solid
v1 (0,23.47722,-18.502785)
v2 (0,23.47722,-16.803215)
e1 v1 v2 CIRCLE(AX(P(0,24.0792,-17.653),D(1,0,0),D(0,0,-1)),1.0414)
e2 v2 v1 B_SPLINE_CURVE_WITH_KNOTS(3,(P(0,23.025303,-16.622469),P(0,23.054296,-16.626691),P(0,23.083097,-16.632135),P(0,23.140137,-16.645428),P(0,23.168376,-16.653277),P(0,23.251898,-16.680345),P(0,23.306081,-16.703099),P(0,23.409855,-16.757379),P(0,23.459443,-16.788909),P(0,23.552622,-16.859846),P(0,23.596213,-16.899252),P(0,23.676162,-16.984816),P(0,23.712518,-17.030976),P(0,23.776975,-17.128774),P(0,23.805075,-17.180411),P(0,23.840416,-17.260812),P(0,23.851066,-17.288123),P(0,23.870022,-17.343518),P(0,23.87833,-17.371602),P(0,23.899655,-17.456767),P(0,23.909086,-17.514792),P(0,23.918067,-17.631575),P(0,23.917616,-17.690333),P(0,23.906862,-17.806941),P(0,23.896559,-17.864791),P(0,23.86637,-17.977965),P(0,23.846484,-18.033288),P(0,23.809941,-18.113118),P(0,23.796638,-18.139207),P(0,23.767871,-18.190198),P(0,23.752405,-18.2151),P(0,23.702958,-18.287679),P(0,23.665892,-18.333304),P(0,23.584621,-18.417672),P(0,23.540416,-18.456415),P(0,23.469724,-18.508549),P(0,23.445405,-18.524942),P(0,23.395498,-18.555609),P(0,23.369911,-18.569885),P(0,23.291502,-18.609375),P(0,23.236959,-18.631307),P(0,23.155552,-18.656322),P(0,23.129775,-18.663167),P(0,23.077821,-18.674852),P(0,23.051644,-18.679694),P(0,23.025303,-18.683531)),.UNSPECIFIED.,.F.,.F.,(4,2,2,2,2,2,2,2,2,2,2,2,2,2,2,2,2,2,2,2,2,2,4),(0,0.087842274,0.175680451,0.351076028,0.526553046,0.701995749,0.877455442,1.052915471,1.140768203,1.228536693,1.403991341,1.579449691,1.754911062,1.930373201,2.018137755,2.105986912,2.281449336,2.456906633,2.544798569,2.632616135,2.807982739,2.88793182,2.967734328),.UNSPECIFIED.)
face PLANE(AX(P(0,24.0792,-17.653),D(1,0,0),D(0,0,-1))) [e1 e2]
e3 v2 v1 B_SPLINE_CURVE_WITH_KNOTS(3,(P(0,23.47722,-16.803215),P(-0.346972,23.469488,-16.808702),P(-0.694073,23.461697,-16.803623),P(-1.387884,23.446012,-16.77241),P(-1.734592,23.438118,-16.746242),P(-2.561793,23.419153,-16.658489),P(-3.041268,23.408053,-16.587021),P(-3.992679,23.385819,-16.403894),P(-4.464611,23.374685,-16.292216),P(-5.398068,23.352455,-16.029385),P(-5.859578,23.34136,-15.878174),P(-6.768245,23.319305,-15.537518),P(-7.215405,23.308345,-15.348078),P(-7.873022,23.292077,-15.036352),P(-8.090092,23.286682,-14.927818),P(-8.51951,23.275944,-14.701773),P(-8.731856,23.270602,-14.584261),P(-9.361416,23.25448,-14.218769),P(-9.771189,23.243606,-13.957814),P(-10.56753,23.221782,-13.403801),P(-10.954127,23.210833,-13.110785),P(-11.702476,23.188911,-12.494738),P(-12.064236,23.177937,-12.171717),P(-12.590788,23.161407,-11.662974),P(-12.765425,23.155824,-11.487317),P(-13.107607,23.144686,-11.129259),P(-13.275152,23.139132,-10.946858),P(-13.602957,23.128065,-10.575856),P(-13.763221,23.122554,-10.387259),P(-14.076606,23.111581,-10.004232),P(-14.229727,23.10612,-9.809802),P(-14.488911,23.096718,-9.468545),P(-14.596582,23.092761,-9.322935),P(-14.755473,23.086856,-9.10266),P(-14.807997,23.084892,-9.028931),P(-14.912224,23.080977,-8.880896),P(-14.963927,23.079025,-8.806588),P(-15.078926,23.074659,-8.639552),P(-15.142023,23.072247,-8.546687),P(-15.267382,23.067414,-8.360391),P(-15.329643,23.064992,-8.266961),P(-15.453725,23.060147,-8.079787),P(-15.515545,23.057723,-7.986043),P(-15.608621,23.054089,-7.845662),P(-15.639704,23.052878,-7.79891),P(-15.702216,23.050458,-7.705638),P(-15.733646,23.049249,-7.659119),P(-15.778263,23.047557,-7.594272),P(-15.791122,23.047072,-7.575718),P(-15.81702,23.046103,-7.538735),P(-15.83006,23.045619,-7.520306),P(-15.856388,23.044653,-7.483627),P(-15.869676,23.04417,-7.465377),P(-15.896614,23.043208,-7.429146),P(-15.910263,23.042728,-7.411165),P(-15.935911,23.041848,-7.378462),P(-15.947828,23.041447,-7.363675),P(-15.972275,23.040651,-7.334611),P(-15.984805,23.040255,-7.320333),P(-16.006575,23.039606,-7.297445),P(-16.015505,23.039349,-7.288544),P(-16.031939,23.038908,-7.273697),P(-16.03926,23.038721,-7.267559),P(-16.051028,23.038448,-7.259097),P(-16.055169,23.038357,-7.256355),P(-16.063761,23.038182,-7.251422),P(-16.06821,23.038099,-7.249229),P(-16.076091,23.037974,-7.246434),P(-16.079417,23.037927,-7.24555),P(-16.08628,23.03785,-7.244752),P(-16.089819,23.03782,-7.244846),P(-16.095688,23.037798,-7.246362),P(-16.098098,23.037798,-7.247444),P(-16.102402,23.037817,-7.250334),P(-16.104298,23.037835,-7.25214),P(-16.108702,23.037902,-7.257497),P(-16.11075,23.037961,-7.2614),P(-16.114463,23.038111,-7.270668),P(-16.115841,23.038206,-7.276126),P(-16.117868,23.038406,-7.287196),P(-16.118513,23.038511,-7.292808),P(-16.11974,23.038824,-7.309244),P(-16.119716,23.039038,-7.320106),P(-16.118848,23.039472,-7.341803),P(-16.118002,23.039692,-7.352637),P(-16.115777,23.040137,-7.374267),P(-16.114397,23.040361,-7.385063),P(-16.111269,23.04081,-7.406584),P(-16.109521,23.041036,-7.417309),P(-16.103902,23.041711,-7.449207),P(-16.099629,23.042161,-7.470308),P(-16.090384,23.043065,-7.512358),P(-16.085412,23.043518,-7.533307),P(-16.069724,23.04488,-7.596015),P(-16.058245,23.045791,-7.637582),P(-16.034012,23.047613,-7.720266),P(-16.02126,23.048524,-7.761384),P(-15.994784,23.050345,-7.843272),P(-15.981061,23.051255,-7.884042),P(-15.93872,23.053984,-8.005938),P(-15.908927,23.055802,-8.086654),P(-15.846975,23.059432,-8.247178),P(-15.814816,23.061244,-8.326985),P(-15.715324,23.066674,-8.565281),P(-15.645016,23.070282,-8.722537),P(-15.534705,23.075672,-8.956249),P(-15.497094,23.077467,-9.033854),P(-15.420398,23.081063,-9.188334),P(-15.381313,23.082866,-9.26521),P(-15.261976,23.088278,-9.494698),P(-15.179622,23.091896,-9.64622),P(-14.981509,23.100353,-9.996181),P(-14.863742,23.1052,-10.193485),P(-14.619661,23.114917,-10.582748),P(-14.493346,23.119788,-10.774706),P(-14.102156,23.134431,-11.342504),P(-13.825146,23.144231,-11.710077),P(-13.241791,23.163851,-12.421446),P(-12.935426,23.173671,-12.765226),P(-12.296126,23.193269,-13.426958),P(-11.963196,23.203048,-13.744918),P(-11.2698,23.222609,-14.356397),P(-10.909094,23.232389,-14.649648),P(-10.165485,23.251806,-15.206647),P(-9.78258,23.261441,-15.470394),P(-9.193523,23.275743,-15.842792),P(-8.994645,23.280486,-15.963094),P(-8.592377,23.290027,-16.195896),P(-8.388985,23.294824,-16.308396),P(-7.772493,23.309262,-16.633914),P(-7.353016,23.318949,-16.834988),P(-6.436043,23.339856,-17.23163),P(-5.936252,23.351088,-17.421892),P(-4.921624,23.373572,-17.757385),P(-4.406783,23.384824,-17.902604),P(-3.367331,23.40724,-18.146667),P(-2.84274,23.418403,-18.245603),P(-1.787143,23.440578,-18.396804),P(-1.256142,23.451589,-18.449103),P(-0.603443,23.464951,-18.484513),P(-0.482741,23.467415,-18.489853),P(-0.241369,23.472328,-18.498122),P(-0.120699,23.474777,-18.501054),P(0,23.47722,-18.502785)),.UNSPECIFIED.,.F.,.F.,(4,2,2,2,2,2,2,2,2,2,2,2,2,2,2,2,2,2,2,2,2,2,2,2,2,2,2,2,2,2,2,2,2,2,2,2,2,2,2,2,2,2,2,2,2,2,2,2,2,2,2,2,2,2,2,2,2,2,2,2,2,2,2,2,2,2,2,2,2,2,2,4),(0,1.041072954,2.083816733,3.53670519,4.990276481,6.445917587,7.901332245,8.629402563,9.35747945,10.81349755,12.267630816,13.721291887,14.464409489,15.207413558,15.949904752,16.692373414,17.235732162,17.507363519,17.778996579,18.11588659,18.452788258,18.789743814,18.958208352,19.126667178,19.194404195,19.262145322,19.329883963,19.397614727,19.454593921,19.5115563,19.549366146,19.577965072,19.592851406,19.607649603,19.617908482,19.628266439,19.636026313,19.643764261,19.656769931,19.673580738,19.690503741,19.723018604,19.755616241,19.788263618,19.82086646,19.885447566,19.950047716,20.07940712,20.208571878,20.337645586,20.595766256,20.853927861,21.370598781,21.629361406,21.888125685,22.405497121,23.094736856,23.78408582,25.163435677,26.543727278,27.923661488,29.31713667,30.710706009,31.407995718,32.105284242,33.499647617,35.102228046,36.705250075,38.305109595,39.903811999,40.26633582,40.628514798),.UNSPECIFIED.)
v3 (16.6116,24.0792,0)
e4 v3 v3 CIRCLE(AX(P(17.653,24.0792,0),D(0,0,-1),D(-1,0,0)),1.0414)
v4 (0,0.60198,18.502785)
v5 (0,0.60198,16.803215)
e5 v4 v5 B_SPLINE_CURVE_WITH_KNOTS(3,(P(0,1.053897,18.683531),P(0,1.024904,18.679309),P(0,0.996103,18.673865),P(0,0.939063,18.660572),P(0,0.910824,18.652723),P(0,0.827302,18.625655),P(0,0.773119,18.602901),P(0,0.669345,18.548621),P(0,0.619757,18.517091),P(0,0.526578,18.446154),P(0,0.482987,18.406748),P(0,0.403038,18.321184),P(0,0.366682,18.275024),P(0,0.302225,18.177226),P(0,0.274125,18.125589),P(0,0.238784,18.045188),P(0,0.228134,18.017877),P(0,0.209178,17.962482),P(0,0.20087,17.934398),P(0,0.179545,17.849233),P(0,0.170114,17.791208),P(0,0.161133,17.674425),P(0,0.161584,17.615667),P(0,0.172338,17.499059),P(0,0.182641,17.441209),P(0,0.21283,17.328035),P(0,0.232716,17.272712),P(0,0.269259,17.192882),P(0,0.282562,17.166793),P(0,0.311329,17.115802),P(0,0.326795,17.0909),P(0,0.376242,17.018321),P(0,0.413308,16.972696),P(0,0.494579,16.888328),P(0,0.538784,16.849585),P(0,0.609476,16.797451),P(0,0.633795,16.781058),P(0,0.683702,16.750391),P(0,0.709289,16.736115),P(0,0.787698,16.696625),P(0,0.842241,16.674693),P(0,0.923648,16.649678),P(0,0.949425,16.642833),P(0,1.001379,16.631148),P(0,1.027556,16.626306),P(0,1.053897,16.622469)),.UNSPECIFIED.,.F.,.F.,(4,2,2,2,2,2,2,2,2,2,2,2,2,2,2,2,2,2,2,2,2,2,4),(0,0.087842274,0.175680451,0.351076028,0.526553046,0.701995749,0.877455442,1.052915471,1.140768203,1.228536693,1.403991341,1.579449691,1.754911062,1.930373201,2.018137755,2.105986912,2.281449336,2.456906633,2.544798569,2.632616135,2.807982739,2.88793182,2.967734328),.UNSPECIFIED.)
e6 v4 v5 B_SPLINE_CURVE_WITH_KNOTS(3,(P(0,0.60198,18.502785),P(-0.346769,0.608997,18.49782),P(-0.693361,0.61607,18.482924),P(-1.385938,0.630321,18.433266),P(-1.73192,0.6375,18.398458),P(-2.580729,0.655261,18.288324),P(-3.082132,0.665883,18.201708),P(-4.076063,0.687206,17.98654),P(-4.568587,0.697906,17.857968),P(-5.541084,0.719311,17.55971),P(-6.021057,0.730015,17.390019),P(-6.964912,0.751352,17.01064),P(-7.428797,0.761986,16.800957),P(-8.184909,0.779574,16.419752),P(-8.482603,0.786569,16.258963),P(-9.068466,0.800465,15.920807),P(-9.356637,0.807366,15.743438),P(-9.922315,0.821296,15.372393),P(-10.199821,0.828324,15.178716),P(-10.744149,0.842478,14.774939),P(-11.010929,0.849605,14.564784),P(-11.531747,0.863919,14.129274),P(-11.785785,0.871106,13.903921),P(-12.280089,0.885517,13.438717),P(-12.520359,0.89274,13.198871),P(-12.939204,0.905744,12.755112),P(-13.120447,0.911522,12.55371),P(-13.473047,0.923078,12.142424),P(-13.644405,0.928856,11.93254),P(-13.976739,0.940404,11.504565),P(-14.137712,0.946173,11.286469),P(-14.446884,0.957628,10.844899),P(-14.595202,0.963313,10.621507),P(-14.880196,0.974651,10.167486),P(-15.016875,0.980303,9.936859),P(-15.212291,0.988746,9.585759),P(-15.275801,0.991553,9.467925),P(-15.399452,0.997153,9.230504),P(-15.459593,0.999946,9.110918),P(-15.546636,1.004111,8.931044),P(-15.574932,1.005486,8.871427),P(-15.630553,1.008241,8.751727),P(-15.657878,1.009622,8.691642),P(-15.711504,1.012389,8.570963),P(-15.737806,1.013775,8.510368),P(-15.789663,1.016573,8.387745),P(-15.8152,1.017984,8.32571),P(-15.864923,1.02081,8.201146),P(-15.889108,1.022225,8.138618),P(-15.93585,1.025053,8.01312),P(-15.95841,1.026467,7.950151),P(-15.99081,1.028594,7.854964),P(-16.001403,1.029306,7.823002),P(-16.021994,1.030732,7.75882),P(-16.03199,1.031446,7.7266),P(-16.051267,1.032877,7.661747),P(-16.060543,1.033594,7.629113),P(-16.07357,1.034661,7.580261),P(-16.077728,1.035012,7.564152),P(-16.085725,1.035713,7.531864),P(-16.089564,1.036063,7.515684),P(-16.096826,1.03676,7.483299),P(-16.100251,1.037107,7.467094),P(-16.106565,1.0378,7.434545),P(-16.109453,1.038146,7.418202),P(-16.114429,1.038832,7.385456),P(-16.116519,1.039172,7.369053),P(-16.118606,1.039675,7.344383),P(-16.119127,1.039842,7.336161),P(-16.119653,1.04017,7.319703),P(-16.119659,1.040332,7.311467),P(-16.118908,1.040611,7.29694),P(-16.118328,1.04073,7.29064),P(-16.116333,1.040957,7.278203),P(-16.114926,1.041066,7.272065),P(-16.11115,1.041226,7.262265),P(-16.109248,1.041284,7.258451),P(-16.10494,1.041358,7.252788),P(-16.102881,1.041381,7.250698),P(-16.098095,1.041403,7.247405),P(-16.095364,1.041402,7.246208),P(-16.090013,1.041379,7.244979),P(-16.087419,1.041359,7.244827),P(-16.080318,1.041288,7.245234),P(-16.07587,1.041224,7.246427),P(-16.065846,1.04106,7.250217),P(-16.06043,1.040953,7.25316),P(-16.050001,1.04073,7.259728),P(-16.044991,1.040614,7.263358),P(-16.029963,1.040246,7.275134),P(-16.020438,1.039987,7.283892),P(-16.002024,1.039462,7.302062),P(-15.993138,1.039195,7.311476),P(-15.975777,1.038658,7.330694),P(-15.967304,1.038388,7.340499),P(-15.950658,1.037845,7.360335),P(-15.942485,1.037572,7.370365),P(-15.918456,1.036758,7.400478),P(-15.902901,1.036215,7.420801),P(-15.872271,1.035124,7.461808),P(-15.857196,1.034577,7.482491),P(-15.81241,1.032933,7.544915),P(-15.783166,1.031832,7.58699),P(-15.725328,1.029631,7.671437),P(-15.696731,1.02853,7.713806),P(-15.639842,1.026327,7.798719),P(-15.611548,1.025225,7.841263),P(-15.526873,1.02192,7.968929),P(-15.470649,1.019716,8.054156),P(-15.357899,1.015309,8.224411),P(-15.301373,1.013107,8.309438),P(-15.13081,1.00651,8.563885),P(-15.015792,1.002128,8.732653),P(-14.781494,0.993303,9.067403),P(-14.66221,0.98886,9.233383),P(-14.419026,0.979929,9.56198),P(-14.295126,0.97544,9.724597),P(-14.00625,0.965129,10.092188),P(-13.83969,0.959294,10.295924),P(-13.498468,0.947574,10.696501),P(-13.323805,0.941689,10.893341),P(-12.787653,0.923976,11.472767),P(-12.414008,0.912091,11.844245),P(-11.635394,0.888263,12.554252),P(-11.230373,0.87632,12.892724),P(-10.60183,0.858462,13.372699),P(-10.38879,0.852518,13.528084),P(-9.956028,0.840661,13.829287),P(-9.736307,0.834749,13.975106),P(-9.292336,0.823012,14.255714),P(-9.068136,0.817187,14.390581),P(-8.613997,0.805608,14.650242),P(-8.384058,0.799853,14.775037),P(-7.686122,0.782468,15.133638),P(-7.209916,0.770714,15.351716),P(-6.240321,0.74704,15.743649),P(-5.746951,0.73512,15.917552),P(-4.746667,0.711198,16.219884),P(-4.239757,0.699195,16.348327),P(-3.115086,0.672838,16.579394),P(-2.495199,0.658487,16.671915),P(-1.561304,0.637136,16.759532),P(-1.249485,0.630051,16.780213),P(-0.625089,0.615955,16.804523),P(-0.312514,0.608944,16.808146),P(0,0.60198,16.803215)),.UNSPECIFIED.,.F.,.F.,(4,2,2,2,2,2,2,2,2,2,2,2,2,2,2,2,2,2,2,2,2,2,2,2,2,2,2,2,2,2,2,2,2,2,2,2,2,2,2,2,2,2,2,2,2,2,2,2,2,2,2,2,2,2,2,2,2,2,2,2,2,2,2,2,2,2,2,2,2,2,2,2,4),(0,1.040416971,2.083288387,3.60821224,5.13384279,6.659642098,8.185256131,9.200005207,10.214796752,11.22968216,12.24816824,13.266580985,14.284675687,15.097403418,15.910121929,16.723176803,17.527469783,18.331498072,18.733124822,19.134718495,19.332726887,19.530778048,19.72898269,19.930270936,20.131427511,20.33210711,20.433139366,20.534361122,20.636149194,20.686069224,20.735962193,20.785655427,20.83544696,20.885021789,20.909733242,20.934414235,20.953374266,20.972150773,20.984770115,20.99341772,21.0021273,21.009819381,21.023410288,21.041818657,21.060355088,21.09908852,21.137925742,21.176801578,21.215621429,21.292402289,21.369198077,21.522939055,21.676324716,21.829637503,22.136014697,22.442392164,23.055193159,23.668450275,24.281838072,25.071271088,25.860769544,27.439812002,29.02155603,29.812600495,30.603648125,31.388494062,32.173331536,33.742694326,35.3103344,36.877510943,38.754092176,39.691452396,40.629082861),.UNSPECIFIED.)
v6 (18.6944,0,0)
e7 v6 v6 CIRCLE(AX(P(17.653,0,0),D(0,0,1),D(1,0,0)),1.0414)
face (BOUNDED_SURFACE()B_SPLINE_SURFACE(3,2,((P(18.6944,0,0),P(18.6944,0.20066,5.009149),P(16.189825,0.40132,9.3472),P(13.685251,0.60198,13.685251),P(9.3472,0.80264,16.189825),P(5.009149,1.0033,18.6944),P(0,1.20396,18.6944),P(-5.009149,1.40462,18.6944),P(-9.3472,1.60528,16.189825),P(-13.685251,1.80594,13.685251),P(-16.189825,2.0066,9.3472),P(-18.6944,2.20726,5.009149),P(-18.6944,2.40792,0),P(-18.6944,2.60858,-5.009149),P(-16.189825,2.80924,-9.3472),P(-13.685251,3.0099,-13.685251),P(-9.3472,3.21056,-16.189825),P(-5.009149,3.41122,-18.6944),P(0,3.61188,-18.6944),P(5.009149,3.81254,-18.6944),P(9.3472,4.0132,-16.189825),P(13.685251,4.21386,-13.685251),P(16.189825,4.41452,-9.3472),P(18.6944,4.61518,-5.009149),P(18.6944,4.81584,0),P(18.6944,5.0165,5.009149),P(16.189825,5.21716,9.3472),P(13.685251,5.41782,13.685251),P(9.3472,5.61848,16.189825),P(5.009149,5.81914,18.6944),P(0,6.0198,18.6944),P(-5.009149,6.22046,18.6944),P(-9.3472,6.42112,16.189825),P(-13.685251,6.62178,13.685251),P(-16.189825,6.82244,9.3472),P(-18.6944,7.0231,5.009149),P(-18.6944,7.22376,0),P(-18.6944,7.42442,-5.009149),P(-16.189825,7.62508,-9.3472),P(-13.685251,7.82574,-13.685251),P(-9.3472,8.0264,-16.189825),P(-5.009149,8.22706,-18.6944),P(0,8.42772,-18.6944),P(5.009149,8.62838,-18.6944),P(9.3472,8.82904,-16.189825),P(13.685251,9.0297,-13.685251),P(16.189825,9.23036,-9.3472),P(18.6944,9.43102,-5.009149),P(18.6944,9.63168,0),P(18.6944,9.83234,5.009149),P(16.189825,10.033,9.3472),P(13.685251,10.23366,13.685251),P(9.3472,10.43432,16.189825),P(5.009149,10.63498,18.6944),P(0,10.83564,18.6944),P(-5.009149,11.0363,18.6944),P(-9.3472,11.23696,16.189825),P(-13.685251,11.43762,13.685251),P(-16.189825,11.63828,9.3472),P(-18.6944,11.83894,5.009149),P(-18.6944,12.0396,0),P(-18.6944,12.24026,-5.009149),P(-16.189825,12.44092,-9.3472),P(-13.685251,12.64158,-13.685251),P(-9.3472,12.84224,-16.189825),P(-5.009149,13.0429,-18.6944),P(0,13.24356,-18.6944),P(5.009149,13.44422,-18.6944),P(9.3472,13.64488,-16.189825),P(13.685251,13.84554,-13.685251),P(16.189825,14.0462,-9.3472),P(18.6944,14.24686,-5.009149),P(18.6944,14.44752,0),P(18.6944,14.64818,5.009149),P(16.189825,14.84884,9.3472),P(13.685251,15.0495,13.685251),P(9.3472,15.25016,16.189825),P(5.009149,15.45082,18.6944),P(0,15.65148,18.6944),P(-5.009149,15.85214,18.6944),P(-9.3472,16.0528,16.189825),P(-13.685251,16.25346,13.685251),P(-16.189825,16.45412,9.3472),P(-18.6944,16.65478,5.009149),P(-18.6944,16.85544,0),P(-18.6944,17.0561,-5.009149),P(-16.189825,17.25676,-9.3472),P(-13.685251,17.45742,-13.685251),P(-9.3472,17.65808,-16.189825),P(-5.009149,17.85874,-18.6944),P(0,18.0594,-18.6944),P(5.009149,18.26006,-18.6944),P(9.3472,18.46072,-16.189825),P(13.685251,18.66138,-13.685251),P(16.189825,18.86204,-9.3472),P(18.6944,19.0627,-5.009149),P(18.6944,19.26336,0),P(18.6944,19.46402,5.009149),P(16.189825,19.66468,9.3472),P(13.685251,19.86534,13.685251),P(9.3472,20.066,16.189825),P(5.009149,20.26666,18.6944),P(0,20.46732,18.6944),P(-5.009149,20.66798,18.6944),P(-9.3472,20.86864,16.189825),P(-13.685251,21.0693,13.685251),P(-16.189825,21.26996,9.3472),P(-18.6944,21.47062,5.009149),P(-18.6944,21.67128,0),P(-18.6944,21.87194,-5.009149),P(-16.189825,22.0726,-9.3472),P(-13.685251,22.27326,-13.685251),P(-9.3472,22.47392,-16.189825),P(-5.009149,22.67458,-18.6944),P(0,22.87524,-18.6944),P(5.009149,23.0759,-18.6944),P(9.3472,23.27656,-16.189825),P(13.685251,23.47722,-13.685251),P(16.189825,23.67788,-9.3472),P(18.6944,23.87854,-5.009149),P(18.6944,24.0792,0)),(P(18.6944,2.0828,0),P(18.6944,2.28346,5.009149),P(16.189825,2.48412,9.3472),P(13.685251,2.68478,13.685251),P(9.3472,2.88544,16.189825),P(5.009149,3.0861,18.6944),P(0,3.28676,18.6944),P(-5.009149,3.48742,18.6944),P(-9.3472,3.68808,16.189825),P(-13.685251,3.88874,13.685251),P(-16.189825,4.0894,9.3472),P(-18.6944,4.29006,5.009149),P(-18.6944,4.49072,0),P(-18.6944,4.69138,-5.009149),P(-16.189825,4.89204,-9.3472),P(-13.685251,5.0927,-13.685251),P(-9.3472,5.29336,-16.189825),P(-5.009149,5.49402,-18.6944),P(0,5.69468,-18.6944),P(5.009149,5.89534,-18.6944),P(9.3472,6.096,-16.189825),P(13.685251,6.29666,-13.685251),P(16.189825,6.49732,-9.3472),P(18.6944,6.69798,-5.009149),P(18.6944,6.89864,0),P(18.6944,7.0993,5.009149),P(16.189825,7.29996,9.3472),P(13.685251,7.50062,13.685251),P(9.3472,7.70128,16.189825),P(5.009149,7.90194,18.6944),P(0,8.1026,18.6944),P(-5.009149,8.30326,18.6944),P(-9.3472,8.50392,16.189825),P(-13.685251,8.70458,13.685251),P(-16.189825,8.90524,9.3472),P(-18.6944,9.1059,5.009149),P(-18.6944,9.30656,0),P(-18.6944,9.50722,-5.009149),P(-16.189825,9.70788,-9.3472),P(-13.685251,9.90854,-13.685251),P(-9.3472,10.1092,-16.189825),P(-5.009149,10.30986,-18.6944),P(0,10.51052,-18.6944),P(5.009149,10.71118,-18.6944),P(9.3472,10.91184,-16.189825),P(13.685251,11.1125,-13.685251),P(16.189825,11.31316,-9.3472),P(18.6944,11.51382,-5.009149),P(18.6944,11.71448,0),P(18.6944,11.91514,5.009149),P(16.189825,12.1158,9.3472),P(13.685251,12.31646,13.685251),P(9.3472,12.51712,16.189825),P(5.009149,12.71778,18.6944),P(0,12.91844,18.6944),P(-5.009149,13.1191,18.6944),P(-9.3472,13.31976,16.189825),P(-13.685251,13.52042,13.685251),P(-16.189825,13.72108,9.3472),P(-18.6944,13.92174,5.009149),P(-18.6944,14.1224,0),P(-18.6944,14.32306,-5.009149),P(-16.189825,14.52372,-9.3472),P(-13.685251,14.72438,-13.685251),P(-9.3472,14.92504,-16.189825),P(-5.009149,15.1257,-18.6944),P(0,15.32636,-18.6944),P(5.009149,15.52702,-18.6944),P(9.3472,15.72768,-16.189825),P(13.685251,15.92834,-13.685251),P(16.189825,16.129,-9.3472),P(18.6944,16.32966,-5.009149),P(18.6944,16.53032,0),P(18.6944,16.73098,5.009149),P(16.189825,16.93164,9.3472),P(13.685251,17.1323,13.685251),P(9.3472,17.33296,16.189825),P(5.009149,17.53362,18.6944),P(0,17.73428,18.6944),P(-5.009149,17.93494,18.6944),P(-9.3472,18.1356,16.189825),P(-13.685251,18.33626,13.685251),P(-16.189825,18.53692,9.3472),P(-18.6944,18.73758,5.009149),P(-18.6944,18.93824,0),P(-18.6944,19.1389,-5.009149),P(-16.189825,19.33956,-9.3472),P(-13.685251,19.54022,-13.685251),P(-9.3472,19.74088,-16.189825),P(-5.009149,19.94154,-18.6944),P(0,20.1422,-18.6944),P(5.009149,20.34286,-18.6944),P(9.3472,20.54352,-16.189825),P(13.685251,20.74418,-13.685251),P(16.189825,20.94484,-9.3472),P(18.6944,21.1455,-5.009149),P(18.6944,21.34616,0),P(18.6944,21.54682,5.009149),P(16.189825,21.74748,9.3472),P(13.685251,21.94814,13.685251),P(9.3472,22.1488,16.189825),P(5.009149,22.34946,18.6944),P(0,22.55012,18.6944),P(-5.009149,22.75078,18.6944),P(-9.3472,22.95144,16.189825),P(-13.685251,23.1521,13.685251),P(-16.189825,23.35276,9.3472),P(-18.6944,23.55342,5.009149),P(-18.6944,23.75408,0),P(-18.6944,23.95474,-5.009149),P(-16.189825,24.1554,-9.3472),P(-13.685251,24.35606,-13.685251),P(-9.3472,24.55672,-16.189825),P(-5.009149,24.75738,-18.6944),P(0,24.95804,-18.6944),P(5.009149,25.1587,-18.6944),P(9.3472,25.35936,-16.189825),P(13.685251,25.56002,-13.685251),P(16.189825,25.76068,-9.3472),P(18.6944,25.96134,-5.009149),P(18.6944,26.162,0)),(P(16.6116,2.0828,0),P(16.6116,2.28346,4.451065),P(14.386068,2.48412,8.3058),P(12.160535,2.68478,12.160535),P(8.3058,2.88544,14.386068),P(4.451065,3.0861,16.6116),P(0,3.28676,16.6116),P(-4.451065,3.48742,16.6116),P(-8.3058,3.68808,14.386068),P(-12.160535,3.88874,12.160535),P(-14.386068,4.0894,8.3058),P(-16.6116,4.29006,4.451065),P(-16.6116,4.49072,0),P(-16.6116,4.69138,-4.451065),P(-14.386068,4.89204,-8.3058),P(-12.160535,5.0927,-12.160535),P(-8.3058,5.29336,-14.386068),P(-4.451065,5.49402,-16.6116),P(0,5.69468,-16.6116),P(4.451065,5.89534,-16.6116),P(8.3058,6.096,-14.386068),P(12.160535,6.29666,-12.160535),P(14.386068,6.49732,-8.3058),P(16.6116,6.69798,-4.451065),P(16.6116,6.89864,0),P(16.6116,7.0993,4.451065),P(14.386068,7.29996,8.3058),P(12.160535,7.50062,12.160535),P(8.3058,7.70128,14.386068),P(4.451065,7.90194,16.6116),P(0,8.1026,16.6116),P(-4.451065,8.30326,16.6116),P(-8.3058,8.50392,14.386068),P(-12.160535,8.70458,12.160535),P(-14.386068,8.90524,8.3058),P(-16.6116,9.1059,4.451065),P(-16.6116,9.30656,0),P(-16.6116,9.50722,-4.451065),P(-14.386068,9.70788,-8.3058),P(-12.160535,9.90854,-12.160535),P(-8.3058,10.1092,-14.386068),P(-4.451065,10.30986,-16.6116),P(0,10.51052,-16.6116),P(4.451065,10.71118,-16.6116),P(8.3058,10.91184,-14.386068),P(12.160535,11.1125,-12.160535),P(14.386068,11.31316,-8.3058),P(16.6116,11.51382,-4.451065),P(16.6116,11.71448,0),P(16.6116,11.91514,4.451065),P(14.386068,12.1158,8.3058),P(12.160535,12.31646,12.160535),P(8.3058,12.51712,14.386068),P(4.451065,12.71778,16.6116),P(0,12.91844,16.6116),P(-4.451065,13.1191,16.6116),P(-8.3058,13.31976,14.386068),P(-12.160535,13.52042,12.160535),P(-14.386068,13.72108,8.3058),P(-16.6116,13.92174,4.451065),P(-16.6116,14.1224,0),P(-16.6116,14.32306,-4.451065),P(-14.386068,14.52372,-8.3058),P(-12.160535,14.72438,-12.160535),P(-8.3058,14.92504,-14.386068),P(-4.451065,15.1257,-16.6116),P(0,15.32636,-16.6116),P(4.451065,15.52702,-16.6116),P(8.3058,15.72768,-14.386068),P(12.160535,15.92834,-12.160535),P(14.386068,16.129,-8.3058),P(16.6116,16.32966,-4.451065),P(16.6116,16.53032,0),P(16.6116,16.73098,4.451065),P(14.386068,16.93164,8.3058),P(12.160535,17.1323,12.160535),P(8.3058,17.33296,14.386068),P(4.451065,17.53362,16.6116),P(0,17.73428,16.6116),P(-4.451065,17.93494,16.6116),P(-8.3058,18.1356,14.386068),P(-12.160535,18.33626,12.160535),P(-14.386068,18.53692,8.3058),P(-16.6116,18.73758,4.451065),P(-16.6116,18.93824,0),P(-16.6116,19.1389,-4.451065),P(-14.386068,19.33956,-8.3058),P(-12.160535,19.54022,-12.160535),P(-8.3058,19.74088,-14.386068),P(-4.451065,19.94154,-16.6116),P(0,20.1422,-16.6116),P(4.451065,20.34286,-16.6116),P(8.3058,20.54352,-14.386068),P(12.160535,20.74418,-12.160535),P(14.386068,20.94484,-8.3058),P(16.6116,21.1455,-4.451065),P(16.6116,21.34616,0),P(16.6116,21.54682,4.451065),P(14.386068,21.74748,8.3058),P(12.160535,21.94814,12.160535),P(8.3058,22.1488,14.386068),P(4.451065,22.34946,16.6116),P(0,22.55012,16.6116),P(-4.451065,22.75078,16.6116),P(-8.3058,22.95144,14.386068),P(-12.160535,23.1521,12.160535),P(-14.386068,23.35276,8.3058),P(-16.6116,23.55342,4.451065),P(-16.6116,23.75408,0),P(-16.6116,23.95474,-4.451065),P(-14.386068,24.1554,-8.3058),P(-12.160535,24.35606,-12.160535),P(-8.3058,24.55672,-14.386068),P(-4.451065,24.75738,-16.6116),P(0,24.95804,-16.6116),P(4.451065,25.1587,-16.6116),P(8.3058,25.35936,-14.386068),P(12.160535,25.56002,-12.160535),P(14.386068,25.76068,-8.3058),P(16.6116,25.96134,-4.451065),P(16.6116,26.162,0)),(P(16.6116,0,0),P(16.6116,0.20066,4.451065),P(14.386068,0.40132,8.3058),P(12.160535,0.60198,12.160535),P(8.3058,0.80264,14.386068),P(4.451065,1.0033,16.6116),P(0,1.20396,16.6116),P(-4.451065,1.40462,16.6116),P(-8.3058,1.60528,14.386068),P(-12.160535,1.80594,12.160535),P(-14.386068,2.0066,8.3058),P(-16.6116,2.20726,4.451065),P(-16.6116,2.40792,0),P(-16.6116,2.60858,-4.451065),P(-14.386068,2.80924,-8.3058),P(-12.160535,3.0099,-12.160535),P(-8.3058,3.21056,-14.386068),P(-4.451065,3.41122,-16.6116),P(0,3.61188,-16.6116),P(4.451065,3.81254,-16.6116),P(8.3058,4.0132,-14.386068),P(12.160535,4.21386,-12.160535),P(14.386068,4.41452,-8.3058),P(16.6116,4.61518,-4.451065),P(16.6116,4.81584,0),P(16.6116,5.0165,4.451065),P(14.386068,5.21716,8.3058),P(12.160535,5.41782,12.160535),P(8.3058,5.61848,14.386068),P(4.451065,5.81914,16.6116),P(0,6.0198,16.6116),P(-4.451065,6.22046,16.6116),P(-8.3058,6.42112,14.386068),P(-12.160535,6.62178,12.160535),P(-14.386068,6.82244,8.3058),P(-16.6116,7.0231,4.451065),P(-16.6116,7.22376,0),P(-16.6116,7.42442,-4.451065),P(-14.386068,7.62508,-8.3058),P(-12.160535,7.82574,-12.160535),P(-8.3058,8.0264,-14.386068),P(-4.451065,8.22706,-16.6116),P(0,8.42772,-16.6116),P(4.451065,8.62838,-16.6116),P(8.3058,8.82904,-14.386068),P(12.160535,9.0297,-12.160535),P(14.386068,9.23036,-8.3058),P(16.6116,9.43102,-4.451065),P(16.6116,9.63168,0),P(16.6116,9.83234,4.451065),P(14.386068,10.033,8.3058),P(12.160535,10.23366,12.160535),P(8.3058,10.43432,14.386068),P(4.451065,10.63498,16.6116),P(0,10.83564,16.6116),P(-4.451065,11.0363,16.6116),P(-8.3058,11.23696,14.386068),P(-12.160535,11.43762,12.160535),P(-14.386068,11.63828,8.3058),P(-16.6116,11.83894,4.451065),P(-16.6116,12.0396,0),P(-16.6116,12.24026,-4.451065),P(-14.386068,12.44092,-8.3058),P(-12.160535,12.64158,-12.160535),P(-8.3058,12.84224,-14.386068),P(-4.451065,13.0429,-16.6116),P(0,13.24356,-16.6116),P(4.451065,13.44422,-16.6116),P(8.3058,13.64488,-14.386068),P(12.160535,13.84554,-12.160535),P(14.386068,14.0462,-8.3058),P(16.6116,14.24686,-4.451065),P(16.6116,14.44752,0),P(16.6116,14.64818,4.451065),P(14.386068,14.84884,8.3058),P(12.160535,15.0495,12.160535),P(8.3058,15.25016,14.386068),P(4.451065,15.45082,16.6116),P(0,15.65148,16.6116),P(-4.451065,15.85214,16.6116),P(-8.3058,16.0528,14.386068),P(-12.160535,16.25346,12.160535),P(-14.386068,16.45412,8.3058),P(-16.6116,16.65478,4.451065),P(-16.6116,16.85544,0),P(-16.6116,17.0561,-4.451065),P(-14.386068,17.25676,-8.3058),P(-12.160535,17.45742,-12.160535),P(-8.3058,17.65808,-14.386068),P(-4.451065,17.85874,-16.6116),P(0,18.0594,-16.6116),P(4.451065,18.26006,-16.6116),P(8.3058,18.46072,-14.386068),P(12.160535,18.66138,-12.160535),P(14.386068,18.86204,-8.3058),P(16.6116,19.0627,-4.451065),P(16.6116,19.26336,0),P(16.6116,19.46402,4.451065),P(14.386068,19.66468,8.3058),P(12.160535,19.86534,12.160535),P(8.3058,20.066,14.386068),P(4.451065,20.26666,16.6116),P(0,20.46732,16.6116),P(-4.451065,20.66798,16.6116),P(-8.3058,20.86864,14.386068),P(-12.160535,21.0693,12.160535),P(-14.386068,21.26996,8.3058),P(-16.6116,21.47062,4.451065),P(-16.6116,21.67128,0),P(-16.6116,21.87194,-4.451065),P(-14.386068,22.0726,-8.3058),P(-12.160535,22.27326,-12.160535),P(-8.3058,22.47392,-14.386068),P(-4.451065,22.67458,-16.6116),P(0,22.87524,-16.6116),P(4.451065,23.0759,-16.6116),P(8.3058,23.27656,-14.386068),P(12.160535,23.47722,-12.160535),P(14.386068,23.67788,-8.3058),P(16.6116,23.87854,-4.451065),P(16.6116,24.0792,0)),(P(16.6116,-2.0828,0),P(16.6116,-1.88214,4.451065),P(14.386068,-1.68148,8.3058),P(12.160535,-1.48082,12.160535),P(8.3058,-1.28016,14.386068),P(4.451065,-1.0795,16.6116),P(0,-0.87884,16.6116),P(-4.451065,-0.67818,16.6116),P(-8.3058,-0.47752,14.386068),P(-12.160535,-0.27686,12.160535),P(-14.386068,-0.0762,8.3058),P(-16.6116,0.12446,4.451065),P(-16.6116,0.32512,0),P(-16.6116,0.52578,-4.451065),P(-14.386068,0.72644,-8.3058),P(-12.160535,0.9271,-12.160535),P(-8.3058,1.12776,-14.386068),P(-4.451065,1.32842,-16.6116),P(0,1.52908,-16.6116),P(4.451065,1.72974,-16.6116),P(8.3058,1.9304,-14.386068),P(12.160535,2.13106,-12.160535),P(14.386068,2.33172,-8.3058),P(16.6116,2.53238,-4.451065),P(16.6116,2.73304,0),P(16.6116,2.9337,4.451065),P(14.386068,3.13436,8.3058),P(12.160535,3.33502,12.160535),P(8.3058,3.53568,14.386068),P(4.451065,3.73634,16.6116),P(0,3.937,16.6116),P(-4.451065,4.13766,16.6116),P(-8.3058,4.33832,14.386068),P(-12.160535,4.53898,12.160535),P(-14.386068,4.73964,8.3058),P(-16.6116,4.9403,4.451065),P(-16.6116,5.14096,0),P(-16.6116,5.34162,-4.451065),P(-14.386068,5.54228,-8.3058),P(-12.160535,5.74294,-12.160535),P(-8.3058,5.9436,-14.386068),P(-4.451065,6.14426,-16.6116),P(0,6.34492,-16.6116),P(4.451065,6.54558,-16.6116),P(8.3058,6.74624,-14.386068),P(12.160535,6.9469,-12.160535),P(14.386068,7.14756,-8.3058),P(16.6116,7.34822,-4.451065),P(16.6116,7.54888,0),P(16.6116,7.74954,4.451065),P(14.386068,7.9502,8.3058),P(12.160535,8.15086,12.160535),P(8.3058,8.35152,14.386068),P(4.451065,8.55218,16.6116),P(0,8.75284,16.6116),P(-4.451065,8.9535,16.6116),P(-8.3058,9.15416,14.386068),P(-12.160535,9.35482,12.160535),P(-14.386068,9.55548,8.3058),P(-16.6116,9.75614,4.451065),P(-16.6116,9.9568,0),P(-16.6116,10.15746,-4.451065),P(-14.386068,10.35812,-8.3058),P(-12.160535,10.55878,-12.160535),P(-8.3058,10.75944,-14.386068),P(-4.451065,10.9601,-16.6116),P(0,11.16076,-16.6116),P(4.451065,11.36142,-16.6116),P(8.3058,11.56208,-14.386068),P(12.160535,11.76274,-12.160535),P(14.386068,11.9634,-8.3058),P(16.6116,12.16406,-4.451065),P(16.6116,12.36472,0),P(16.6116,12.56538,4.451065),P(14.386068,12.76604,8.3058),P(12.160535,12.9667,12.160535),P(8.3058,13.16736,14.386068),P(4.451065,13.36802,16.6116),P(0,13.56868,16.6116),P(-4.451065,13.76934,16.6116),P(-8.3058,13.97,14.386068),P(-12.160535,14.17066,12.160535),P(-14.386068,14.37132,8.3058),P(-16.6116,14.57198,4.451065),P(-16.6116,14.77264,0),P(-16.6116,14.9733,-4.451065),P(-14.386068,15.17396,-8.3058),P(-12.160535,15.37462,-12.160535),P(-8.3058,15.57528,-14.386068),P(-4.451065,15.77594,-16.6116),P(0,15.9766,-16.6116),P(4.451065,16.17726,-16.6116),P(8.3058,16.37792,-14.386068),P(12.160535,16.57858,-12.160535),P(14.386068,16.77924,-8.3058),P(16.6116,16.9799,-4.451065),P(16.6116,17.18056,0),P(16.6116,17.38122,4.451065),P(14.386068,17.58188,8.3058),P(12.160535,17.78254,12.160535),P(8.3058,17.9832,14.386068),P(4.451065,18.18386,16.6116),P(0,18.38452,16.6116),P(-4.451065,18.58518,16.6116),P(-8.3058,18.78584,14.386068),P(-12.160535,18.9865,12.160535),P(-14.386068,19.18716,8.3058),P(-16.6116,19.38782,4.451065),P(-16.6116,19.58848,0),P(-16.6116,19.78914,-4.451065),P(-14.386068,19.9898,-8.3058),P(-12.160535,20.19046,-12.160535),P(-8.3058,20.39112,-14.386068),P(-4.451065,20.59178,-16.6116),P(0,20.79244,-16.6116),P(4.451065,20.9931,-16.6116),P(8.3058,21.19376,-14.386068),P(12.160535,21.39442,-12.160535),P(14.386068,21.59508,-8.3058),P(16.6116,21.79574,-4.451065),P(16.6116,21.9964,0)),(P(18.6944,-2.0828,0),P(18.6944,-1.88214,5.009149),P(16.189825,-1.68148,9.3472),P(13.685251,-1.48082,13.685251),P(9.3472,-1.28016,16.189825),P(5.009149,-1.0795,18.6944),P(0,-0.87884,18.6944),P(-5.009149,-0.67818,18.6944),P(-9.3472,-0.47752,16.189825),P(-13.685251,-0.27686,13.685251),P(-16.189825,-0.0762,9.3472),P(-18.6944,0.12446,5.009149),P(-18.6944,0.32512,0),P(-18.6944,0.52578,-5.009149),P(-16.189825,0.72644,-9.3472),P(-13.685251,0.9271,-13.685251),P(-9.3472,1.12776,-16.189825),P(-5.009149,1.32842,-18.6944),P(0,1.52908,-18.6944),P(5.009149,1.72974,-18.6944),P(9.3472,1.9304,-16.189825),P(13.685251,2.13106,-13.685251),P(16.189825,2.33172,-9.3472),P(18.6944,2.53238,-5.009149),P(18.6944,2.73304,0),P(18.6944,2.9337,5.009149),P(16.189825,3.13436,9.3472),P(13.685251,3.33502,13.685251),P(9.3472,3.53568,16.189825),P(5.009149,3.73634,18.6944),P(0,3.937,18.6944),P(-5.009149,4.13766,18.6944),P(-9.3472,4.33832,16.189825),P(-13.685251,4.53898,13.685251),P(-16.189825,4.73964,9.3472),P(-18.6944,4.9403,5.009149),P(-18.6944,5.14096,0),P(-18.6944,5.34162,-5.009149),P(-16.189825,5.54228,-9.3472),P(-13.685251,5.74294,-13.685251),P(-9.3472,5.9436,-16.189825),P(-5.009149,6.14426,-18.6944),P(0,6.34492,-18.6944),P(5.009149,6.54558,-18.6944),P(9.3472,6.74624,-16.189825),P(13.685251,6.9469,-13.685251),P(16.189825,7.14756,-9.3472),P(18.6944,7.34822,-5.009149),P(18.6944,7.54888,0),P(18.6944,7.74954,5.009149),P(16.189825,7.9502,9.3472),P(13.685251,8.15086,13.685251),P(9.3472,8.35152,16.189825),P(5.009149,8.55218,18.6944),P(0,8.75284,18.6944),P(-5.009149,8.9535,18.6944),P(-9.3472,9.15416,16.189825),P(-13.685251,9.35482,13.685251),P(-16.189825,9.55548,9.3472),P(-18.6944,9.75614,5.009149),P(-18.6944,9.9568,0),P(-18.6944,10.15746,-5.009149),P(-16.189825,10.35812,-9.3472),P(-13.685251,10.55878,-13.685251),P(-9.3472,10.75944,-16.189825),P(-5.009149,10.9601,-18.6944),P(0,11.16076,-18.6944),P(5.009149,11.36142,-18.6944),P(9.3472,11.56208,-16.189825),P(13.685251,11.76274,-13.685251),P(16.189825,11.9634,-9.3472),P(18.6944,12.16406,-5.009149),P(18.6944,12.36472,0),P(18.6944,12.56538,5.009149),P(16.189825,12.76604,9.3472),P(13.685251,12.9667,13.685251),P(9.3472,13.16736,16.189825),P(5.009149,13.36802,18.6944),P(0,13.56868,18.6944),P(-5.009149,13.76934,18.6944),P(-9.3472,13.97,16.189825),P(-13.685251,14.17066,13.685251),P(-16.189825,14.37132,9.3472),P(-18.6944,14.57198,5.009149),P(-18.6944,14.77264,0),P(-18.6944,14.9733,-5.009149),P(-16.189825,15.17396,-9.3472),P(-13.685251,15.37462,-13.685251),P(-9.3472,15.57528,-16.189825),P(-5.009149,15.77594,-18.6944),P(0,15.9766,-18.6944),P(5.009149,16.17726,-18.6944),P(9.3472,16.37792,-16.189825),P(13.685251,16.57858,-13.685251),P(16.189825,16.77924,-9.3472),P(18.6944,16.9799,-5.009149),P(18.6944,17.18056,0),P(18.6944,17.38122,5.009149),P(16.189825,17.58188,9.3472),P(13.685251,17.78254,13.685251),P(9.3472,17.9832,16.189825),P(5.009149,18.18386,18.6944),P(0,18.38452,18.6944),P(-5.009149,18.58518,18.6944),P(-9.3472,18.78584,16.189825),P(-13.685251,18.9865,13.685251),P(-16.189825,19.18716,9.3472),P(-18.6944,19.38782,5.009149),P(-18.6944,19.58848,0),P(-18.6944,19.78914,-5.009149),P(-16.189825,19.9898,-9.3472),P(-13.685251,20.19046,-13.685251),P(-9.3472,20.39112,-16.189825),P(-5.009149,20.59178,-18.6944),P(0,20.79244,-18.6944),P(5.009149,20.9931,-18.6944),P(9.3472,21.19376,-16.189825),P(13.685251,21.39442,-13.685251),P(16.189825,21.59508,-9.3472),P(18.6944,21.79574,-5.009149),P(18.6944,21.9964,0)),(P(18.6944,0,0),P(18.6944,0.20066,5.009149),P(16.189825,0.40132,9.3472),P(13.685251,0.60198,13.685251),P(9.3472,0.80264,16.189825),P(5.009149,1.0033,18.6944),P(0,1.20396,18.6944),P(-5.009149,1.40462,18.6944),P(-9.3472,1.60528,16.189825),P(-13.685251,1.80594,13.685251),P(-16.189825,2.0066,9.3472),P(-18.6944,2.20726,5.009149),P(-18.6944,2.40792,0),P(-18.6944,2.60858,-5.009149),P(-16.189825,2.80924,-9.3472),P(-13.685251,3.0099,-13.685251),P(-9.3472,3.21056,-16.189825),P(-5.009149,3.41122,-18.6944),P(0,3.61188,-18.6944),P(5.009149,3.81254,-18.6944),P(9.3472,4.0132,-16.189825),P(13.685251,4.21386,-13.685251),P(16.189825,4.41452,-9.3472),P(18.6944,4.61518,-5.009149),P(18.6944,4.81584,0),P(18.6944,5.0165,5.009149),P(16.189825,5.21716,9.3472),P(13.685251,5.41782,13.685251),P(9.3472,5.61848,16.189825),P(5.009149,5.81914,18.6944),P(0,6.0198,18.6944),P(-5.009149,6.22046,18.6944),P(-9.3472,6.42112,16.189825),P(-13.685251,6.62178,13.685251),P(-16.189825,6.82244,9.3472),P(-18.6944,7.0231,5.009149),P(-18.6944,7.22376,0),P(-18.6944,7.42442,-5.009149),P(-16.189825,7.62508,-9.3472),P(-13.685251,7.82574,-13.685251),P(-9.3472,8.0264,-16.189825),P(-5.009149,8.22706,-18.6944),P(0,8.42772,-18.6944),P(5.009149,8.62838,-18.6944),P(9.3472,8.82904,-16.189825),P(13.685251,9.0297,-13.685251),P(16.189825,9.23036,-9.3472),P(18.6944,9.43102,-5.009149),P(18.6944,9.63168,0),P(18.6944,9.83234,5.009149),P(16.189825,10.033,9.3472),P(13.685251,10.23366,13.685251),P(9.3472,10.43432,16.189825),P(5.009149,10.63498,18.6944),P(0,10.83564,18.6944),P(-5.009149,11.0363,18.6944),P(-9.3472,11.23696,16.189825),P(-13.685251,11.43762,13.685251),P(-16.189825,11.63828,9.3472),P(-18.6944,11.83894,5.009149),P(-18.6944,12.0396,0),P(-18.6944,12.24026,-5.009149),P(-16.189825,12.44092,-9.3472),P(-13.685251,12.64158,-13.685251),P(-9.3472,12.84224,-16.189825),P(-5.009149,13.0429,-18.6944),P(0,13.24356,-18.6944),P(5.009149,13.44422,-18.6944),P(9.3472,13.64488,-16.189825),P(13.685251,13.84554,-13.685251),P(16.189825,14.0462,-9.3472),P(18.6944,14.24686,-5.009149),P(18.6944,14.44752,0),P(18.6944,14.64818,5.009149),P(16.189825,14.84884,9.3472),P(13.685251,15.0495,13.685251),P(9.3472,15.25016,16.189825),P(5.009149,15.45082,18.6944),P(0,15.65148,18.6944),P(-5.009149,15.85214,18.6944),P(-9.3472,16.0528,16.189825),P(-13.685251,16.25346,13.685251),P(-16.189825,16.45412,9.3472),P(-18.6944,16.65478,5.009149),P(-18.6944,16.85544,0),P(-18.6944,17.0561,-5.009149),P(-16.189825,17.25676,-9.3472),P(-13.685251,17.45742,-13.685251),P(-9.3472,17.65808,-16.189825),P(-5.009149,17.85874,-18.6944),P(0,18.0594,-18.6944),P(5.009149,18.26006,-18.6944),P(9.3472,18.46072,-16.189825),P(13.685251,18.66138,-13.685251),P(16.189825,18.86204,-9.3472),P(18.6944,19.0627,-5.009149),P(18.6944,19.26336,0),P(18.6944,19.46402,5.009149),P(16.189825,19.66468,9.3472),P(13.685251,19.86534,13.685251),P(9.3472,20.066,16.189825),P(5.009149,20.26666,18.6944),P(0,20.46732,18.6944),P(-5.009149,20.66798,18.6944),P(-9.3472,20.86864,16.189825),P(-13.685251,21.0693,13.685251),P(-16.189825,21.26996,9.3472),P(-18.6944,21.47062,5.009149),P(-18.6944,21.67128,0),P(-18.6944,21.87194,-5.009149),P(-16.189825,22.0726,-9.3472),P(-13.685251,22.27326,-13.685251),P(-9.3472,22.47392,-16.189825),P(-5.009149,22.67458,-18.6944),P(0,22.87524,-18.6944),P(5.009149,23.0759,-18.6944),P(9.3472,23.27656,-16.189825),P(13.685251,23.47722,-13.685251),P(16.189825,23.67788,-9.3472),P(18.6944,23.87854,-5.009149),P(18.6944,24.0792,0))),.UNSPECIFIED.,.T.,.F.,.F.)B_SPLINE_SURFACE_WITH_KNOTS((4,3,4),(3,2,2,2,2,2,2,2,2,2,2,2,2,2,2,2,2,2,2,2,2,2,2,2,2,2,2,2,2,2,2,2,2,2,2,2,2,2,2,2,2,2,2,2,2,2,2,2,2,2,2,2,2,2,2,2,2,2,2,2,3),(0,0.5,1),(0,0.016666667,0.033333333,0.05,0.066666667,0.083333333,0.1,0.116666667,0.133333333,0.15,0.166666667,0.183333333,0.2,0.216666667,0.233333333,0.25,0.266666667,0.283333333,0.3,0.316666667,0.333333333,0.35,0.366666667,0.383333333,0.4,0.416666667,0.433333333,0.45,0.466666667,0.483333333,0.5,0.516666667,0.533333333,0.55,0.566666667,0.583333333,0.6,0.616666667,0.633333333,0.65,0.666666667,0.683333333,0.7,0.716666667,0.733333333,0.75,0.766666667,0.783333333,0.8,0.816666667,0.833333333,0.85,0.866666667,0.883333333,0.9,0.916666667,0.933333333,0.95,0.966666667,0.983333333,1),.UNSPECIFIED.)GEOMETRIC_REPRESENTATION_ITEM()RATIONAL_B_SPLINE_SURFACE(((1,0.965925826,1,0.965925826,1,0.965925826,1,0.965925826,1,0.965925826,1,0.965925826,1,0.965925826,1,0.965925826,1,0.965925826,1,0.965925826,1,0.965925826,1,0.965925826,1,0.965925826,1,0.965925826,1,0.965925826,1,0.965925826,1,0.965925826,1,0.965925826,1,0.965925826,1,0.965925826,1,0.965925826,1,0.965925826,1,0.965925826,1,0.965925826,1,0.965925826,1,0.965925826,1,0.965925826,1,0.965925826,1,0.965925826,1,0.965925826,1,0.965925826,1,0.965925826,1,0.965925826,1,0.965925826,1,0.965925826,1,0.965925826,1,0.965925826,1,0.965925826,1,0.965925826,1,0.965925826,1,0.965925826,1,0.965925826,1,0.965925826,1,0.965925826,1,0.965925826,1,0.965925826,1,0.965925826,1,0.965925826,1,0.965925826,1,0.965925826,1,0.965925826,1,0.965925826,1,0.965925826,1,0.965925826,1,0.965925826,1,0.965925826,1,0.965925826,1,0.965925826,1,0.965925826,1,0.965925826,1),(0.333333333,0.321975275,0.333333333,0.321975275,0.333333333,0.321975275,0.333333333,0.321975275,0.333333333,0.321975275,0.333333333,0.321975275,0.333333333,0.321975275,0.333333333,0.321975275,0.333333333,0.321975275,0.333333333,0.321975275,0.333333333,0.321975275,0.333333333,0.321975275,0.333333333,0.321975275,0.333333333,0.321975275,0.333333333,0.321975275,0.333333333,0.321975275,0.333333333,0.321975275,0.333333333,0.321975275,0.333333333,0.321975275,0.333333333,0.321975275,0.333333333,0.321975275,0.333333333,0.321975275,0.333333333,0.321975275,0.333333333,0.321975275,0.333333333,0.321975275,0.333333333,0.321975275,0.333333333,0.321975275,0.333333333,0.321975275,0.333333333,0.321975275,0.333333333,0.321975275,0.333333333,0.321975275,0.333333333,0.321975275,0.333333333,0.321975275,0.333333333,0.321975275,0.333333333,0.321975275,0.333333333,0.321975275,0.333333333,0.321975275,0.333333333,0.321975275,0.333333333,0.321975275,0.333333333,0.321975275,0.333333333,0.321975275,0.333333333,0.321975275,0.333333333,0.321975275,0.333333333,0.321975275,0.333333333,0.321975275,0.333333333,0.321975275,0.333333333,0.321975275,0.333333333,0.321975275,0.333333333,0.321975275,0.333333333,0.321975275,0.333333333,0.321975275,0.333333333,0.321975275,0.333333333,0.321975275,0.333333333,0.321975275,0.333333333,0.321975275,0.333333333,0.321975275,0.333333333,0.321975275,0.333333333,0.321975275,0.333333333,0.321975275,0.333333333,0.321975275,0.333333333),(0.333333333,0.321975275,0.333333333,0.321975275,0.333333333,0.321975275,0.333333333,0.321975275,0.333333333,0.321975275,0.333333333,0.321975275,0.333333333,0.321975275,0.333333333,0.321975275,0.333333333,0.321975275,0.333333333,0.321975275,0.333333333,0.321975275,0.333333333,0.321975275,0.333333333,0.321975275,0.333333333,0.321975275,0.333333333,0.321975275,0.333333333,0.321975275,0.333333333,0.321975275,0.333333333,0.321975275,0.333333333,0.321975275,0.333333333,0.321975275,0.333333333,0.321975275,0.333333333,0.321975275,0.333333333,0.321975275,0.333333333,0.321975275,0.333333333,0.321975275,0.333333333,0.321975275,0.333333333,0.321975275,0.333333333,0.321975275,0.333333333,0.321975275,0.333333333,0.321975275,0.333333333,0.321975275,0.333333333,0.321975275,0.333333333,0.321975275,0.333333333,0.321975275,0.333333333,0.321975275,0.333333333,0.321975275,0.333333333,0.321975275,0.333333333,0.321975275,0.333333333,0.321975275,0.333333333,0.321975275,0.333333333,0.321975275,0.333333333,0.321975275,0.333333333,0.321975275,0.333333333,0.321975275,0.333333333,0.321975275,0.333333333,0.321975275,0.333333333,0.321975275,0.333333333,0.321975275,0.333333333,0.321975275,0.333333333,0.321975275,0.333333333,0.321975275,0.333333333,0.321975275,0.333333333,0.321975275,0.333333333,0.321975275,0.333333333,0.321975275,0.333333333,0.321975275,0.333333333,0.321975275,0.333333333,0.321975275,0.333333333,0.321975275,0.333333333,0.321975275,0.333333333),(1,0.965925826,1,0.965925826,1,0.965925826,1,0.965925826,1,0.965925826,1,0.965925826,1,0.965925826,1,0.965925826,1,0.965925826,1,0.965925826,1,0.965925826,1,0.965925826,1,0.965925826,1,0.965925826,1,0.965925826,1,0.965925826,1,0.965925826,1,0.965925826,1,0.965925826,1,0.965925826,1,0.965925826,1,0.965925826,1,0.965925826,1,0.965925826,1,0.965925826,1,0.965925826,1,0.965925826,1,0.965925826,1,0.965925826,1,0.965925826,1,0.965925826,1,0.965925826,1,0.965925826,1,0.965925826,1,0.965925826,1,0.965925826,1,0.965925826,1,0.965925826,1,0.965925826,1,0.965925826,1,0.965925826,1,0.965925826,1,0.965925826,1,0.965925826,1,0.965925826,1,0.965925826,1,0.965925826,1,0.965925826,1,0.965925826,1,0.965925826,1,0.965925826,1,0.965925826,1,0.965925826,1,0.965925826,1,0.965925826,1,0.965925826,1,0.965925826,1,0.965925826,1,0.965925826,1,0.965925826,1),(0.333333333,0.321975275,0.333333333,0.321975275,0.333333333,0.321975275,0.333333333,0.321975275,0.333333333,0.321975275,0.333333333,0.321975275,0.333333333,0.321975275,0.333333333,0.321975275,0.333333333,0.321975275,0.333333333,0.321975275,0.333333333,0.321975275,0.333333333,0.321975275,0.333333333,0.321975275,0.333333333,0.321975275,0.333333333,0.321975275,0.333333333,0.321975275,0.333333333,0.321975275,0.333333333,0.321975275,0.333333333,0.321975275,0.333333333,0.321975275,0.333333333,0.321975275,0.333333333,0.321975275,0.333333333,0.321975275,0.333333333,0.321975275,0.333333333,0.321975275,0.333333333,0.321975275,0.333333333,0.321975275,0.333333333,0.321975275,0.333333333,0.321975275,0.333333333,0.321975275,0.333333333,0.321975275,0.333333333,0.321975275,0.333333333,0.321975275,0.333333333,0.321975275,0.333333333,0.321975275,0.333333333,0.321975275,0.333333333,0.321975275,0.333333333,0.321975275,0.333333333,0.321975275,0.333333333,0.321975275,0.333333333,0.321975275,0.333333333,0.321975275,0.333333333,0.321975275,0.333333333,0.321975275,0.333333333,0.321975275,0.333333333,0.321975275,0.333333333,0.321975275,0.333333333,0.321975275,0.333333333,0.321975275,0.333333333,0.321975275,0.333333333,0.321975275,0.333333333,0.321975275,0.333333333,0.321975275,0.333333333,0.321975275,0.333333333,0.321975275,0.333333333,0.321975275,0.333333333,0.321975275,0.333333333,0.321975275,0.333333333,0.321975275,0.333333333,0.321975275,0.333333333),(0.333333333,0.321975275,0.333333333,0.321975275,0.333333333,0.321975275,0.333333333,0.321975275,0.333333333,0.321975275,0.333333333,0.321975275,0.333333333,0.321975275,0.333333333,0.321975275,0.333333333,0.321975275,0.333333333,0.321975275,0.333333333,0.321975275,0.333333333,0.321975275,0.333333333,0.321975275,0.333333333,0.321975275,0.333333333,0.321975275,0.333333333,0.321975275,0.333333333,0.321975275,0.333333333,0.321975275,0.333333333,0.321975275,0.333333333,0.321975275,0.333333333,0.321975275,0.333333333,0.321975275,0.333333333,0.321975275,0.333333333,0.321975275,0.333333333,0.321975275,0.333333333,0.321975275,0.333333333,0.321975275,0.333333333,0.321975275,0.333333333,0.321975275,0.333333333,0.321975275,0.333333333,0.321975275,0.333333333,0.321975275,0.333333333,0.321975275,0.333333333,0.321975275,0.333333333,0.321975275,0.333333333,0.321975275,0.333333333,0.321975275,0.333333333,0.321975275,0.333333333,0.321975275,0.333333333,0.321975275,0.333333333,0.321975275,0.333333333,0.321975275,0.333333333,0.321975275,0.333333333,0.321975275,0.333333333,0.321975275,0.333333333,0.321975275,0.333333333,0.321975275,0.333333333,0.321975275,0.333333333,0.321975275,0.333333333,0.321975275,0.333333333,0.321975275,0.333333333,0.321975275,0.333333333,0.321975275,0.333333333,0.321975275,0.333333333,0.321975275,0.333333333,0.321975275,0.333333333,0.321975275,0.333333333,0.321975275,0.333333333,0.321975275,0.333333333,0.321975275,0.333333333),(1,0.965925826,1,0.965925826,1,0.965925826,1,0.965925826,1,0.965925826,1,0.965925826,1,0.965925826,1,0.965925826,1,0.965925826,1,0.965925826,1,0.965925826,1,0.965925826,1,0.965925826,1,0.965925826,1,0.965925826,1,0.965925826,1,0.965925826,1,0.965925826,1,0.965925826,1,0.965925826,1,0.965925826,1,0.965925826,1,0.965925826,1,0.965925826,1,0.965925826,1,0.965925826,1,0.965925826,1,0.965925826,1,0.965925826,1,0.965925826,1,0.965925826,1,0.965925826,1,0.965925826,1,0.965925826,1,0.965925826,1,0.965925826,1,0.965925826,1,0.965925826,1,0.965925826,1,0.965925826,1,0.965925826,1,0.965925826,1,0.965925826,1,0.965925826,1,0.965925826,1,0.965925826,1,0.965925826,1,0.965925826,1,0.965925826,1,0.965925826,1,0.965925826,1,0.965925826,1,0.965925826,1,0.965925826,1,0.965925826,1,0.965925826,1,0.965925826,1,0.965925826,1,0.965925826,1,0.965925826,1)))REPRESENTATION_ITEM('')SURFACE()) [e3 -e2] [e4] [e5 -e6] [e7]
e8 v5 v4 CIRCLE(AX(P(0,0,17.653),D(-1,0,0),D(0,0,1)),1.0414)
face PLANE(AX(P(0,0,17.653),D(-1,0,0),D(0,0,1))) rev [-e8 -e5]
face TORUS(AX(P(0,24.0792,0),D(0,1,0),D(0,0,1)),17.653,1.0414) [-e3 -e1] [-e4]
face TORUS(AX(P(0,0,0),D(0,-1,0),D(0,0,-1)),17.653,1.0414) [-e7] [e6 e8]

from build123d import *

# Parameters (mm, degrees)
SWEEP1_PITCH       = 4.81584
SWEEP1_HEIGHT      = 24.0792
SWEEP1_RADIUS      = 18.6944
SWEEP1_START_ANGLE = 90
SKETCH2_R          = 1.0414
SKETCH3_R          = 1.0414
REVOLVE1_ANGLE     = 270
SKETCH4_R          = 1.0414
REVOLVE2_ANGLE     = 270


with BuildPart() as part:
    # Sweep1: sweep along a helix
    with BuildLine() as sweep1_path:
        add(Helix(SWEEP1_PITCH, SWEEP1_HEIGHT, SWEEP1_RADIUS, center=(0, 0, 0), direction=(0, 1, 0), lefthand=True, mode=Mode.PRIVATE).rotate(Axis((0, 0, 0), (0, 1, 0)), SWEEP1_START_ANGLE))
    # Sketch2 → Sweep1 (sweep)
    with BuildSketch(Plane.XY):
        with Locations((17.653, 0)):
            Circle(SKETCH2_R)
    sweep(path=sweep1_path.line, is_frenet=True)

    # Sketch3 → Revolve1 (revolve)
    with BuildSketch(Plane.XY):
        with Locations((17.653, 24.0792)):
            Circle(SKETCH3_R)
    revolve(axis=Axis((0, 0, 0), (0, -1, 0)), revolution_arc=REVOLVE1_ANGLE)

    # Sketch4 → Revolve2 (revolve)
    with BuildSketch(Plane.XY):
        with Locations((17.653, 0)):
            Circle(SKETCH4_R)
    revolve(axis=Axis((0, 0, 0), (0, 1, 0)), revolution_arc=REVOLVE2_ANGLE)


solid = part.part
